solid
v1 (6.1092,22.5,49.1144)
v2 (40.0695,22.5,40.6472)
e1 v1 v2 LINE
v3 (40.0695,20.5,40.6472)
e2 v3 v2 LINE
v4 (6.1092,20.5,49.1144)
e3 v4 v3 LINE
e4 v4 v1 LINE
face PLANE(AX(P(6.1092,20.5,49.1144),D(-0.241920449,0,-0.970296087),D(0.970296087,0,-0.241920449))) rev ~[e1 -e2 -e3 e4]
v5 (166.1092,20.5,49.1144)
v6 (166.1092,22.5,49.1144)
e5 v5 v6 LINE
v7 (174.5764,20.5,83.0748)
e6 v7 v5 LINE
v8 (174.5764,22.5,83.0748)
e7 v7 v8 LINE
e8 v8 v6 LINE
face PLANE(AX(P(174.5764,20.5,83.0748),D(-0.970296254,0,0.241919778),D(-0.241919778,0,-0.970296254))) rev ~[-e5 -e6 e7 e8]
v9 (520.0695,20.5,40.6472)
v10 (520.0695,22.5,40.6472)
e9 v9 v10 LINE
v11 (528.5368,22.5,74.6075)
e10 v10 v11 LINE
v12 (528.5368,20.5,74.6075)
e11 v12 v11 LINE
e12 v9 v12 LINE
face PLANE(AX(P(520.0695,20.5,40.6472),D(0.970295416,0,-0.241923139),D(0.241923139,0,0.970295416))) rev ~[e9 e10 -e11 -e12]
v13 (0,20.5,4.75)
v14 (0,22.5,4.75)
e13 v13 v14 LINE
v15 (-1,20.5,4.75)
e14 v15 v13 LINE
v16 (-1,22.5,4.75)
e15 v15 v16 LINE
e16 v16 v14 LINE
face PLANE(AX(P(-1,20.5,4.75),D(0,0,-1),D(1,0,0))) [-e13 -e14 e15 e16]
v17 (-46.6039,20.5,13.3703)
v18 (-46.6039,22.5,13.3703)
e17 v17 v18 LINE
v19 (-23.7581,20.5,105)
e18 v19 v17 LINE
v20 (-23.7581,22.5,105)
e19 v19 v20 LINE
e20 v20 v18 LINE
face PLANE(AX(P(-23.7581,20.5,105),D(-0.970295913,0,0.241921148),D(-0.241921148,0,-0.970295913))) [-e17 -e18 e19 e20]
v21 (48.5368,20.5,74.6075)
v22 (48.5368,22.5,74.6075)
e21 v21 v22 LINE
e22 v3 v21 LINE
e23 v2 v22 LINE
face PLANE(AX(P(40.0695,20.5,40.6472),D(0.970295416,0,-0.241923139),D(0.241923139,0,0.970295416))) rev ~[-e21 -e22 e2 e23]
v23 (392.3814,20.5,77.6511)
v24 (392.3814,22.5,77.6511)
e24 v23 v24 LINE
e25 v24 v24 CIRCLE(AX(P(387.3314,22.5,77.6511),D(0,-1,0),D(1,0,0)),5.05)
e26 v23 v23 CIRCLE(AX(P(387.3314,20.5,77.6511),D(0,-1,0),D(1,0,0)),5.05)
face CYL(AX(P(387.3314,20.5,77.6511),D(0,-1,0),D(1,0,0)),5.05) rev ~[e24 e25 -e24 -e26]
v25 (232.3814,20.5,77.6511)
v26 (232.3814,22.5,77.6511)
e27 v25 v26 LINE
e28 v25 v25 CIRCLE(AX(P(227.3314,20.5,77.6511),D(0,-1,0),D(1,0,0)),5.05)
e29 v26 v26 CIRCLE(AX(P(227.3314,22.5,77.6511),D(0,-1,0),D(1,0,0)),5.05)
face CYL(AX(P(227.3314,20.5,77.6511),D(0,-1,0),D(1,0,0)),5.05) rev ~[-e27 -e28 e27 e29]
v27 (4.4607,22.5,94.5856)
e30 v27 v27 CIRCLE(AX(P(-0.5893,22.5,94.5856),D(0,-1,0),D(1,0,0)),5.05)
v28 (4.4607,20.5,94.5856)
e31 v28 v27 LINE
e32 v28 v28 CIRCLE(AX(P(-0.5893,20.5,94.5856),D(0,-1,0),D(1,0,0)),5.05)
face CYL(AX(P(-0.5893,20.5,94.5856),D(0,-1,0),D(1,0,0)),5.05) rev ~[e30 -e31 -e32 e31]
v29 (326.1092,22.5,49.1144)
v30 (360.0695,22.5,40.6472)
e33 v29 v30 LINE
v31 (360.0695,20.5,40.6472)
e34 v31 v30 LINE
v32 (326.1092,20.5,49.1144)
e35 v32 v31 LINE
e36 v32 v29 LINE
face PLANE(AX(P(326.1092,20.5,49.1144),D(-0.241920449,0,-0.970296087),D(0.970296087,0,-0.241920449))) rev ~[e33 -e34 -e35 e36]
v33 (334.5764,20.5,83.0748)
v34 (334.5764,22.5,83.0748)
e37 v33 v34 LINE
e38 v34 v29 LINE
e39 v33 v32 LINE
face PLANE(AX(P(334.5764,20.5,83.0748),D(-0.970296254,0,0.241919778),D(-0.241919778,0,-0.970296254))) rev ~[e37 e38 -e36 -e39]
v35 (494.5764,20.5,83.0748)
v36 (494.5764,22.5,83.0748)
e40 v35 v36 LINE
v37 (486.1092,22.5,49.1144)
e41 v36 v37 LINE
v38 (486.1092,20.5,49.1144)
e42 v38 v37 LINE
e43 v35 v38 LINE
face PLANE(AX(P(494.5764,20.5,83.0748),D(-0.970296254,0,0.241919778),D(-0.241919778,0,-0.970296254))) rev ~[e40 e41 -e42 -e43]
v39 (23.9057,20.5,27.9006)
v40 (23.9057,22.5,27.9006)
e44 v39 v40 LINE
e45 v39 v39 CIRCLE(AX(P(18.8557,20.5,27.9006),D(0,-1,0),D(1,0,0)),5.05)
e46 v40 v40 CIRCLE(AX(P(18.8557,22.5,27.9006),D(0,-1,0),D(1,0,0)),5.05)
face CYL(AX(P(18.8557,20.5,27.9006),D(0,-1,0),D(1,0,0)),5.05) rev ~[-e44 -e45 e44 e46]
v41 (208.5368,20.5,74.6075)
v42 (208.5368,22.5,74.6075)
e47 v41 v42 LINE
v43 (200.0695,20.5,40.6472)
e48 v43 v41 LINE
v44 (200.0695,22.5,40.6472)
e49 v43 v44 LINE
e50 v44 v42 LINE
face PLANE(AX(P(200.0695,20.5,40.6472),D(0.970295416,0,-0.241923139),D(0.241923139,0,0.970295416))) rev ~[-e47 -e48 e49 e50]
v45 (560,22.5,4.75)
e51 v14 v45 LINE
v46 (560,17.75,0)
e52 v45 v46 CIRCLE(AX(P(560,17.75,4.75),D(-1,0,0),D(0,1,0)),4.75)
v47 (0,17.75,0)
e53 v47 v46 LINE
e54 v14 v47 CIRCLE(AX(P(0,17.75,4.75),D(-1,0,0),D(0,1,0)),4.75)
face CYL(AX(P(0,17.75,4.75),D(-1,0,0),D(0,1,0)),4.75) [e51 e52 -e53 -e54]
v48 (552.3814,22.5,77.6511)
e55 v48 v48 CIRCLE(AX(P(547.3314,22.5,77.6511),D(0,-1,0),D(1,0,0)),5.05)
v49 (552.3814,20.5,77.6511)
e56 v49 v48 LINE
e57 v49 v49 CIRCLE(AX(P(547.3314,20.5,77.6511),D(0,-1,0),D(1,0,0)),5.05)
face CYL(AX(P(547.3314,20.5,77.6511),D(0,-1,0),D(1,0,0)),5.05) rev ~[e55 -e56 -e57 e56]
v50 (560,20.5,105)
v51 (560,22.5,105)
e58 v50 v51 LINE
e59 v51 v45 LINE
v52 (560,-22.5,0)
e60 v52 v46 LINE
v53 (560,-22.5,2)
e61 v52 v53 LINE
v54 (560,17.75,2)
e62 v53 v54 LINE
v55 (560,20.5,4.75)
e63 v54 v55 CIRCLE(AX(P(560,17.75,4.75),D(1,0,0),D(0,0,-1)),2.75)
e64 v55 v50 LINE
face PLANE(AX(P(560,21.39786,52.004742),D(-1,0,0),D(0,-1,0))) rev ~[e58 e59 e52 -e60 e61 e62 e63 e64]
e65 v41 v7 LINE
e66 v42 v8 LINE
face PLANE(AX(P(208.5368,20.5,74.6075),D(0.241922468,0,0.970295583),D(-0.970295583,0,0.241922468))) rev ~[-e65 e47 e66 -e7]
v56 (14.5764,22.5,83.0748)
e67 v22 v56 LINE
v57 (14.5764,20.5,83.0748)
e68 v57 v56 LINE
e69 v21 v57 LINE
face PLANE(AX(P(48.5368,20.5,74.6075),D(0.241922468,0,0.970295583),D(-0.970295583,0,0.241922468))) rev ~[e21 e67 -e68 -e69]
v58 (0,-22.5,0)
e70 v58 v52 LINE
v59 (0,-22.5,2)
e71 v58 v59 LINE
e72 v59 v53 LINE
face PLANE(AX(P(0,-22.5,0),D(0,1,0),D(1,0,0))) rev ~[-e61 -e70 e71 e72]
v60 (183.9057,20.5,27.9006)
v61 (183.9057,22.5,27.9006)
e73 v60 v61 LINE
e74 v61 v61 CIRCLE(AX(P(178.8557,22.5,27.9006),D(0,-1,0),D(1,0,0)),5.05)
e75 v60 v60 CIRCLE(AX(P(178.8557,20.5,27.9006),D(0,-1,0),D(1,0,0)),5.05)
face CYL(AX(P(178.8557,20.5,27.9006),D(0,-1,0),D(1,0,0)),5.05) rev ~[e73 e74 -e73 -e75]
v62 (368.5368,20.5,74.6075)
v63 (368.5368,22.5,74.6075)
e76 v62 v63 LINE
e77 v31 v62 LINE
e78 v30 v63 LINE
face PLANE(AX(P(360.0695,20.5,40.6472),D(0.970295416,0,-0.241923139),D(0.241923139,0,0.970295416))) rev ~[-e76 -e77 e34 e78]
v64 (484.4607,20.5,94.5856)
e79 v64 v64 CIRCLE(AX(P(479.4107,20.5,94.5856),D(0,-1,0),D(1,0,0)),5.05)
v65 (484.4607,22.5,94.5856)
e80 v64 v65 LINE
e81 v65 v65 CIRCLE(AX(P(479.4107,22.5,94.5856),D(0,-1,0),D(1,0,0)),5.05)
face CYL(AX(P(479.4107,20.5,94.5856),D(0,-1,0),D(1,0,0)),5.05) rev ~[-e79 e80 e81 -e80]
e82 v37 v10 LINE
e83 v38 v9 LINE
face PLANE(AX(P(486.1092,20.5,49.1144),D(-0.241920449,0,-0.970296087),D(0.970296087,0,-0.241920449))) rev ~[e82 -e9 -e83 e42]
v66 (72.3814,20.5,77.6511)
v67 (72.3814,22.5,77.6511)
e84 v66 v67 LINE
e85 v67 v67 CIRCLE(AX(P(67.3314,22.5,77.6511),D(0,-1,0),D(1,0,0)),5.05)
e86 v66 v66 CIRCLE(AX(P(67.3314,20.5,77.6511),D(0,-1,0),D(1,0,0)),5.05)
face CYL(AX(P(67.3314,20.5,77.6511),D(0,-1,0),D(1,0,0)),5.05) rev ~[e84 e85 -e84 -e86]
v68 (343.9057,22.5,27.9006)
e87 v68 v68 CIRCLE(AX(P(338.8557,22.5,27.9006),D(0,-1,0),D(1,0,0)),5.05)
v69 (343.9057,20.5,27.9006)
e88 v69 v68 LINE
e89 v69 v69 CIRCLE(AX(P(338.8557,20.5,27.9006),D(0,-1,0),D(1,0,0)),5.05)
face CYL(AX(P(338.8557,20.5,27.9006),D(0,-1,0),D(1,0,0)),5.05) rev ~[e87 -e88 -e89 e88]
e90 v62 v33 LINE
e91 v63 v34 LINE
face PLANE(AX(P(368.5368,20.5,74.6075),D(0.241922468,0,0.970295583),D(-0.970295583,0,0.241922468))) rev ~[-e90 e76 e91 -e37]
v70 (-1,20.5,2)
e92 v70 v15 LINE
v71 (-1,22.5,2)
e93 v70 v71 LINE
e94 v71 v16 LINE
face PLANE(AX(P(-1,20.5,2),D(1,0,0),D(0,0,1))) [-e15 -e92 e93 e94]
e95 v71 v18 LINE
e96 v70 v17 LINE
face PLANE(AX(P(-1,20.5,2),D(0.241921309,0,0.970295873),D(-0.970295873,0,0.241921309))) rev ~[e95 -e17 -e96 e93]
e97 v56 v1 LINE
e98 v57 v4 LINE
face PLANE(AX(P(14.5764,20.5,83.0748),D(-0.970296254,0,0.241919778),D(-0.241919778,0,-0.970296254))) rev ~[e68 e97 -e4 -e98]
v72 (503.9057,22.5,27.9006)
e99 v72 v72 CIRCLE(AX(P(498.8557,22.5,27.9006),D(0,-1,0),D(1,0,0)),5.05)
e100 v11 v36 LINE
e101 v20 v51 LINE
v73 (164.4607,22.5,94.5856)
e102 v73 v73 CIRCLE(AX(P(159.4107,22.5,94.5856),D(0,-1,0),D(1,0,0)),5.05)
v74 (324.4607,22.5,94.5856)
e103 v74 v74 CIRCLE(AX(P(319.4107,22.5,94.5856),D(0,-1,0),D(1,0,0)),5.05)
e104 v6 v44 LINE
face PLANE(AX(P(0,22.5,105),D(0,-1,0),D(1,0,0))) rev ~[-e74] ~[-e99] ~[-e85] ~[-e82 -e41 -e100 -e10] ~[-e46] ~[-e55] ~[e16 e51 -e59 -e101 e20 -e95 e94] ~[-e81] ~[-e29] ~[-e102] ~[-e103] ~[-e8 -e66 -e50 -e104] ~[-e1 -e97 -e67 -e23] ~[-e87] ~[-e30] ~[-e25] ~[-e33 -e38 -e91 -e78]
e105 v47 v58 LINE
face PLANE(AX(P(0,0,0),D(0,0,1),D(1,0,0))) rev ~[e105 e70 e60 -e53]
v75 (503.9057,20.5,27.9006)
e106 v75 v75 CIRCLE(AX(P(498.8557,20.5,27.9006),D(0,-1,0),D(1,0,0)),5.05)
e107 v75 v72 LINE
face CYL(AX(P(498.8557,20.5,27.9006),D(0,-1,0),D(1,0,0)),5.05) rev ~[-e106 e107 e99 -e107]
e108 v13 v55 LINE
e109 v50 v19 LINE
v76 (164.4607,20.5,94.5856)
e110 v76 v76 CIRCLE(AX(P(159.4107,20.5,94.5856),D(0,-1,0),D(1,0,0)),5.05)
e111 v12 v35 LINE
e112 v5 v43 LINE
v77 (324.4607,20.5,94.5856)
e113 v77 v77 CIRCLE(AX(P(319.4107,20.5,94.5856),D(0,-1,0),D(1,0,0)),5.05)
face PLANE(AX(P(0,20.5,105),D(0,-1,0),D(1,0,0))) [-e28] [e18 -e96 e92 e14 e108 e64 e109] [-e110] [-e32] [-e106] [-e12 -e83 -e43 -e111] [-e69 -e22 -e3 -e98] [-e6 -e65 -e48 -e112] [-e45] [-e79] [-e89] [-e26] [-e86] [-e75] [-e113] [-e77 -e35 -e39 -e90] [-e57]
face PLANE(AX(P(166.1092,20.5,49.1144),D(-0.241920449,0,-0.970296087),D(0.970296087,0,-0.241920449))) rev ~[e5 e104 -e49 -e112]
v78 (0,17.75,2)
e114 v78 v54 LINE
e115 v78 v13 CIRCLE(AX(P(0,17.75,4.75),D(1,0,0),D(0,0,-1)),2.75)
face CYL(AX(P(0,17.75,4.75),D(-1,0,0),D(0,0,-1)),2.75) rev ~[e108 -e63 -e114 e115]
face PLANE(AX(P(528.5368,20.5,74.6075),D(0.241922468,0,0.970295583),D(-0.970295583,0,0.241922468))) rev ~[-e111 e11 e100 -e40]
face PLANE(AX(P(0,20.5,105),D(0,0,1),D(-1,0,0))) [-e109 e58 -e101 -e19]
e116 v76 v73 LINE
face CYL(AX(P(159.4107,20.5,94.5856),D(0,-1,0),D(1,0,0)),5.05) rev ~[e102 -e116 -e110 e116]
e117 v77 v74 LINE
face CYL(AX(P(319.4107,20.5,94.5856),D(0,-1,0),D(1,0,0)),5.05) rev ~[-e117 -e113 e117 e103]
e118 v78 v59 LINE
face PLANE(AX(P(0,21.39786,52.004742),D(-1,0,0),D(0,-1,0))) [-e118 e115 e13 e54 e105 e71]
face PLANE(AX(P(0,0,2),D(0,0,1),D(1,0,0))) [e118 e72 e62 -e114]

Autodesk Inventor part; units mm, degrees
ref_plane "YZ Plane" through (0, 0, 0) normal (1, 0, 0) x (0, 1, 0)
ref_plane "XZ Plane" through (0, 0, 0) normal (0, 1, 0) x (-1, 0, 0)
ref_plane "XY Plane" through (0, 0, 0) normal (0, 0, 1) x (1, 0, 0)
sketch "Sketch1" plane through (0, 0, 0) normal (0, 0, 1) x (1, 0, 0)
  line L0 (0, -22.5) -> (560, -22.5)
  line L1 (560, -22.5) -> (560, 22.5)
  line L2 (560, 22.5) -> (0, 22.5)
  line L3 (0, 22.5) -> (0, -22.5)
  line L4 (0, -22.5) -> (560, 22.5) construction
  line L5 (560, -22.5) -> (0, 22.5) construction
  point P0 (0, 0)
  point P1 (0, 0)
  dimension "d154" = 560
  dimension "d155" = 45
extrude "Plate3" add sketch "Sketch1" along normal blind 2
sketch "Sketch7" plane through (0, 20.5, 0) normal (0, 1, 0) x (-1, 0, 0)
  line L0 (-560, 0) -> (0, 0)
  line L1 (0, 0) -> (0, 105)
  line L2 (0, 105) -> (-560, 105)
  line L3 (-560, 105) -> (-560, 0)
edge flange "Flange3" height 105 angle 90 thickness 2 bend radius 2.75 thickness toward (0, 1, 0) relief round relief width 2 relief depth 1 edges at (280, 22.5, 2) wall of the first edge with corners at (560, 20.5, 0) (0, 20.5, 0) (0, 20.5, 105) (560, 20.5, 105)
bend "Bend3"
corner "Corner3"
sketch "Sketch11" plane through (0, 20.5, 105) normal (0, -1, 0) x (1, 0, 0)
  line L0 (0, -100.25) -> (560, -100.25) projected
  line L1 (560, -100.25) -> (560, 0) projected
  line L2 (560, 0) -> (0, 0) projected
  line L3 (0, -100.25) -> (0, 0) projected
  line L4 (0, 0) -> (-23.7581, 0)
  line L5 (-23.7581, 0) -> (-49.4388, -103)
  line L6 (-49.4388, -103) -> (-1, -103)
  line L7 (-1, -103) -> (-1, -100.25)
  line L8 (-1, -100.25) -> (0, -100.25)
  line L9 (560, -103) -> (0, -103) projected
  line L10 (-1, -103) -> (-46.6039, -91.6297)
  point P0 (0, -105)
  dimension "d193" = 1
  dimension "d194" = 23.7581
  dimension "d195" = 14
  dimension "d203" = 47
extrude "Extrusion6" add sketch "Sketch11" against normal up to surface (2 mm away) contours L8 L7 L10 L5 L4 L3
sketch "Sketch12" plane through (560, 20.5, 4.75) normal (0, -1, 0) x (1, 0, 0)
  line L0 (-511.4632, 69.8575) -> (-545.4236, 78.3248)
  line L1 (-545.4236, 78.3248) -> (-553.8908, 44.3644)
  line L2 (-553.8908, 44.3644) -> (-519.9305, 35.8972)
  line L3 (-519.9305, 35.8972) -> (-511.4632, 69.8575)
  line L4 (-511.4632, 69.8575) -> (-553.8908, 44.3644) construction
  line L5 (-545.4236, 78.3248) -> (-519.9305, 35.8972) construction
  circle A0 centre (-541.1443, 23.1506) radius 5.05
  circle A1 centre (-492.6686, 72.9011) radius 5.05
  circle A2 centre (-560.5893, 89.8356) radius 5.05
  line L6 (-492.6686, 72.9011) -> (-560.5893, 89.8356) construction
  line L7 (-560.5893, 89.8356) -> (-541.1443, 23.1506) construction
  line L8 (-541.1443, 23.1506) -> (-492.6686, 72.9011) construction
  line L9 (-528.4434, 74.0911) -> (-541.1443, 23.1506) construction
  line L10 (-583.7581, 100.25) -> (-606.6039, 8.6203) projected
  point P0 (-560, -4.75)
  point P1 (-532.677, 57.111)
  point P2 (-543.753, 12.6876)
  dimension "d206" = 35
  dimension "d207" = 35
  dimension "d208" = 10.1
  dimension "d209" = 70
  dimension "d210" = 60
  dimension "d211" = 25
  dimension "d213" = 12
  dimension "d214" = 60
extrude "Cut1" cut sketch "Sketch12" against normal blind 2
pattern_linear "Rectangular Pattern5" count 4 spacing 160 along (1, 0, 0) of "Cut1"
properties part number "MNT-CDF-501 box" material "Stainless Steel"
